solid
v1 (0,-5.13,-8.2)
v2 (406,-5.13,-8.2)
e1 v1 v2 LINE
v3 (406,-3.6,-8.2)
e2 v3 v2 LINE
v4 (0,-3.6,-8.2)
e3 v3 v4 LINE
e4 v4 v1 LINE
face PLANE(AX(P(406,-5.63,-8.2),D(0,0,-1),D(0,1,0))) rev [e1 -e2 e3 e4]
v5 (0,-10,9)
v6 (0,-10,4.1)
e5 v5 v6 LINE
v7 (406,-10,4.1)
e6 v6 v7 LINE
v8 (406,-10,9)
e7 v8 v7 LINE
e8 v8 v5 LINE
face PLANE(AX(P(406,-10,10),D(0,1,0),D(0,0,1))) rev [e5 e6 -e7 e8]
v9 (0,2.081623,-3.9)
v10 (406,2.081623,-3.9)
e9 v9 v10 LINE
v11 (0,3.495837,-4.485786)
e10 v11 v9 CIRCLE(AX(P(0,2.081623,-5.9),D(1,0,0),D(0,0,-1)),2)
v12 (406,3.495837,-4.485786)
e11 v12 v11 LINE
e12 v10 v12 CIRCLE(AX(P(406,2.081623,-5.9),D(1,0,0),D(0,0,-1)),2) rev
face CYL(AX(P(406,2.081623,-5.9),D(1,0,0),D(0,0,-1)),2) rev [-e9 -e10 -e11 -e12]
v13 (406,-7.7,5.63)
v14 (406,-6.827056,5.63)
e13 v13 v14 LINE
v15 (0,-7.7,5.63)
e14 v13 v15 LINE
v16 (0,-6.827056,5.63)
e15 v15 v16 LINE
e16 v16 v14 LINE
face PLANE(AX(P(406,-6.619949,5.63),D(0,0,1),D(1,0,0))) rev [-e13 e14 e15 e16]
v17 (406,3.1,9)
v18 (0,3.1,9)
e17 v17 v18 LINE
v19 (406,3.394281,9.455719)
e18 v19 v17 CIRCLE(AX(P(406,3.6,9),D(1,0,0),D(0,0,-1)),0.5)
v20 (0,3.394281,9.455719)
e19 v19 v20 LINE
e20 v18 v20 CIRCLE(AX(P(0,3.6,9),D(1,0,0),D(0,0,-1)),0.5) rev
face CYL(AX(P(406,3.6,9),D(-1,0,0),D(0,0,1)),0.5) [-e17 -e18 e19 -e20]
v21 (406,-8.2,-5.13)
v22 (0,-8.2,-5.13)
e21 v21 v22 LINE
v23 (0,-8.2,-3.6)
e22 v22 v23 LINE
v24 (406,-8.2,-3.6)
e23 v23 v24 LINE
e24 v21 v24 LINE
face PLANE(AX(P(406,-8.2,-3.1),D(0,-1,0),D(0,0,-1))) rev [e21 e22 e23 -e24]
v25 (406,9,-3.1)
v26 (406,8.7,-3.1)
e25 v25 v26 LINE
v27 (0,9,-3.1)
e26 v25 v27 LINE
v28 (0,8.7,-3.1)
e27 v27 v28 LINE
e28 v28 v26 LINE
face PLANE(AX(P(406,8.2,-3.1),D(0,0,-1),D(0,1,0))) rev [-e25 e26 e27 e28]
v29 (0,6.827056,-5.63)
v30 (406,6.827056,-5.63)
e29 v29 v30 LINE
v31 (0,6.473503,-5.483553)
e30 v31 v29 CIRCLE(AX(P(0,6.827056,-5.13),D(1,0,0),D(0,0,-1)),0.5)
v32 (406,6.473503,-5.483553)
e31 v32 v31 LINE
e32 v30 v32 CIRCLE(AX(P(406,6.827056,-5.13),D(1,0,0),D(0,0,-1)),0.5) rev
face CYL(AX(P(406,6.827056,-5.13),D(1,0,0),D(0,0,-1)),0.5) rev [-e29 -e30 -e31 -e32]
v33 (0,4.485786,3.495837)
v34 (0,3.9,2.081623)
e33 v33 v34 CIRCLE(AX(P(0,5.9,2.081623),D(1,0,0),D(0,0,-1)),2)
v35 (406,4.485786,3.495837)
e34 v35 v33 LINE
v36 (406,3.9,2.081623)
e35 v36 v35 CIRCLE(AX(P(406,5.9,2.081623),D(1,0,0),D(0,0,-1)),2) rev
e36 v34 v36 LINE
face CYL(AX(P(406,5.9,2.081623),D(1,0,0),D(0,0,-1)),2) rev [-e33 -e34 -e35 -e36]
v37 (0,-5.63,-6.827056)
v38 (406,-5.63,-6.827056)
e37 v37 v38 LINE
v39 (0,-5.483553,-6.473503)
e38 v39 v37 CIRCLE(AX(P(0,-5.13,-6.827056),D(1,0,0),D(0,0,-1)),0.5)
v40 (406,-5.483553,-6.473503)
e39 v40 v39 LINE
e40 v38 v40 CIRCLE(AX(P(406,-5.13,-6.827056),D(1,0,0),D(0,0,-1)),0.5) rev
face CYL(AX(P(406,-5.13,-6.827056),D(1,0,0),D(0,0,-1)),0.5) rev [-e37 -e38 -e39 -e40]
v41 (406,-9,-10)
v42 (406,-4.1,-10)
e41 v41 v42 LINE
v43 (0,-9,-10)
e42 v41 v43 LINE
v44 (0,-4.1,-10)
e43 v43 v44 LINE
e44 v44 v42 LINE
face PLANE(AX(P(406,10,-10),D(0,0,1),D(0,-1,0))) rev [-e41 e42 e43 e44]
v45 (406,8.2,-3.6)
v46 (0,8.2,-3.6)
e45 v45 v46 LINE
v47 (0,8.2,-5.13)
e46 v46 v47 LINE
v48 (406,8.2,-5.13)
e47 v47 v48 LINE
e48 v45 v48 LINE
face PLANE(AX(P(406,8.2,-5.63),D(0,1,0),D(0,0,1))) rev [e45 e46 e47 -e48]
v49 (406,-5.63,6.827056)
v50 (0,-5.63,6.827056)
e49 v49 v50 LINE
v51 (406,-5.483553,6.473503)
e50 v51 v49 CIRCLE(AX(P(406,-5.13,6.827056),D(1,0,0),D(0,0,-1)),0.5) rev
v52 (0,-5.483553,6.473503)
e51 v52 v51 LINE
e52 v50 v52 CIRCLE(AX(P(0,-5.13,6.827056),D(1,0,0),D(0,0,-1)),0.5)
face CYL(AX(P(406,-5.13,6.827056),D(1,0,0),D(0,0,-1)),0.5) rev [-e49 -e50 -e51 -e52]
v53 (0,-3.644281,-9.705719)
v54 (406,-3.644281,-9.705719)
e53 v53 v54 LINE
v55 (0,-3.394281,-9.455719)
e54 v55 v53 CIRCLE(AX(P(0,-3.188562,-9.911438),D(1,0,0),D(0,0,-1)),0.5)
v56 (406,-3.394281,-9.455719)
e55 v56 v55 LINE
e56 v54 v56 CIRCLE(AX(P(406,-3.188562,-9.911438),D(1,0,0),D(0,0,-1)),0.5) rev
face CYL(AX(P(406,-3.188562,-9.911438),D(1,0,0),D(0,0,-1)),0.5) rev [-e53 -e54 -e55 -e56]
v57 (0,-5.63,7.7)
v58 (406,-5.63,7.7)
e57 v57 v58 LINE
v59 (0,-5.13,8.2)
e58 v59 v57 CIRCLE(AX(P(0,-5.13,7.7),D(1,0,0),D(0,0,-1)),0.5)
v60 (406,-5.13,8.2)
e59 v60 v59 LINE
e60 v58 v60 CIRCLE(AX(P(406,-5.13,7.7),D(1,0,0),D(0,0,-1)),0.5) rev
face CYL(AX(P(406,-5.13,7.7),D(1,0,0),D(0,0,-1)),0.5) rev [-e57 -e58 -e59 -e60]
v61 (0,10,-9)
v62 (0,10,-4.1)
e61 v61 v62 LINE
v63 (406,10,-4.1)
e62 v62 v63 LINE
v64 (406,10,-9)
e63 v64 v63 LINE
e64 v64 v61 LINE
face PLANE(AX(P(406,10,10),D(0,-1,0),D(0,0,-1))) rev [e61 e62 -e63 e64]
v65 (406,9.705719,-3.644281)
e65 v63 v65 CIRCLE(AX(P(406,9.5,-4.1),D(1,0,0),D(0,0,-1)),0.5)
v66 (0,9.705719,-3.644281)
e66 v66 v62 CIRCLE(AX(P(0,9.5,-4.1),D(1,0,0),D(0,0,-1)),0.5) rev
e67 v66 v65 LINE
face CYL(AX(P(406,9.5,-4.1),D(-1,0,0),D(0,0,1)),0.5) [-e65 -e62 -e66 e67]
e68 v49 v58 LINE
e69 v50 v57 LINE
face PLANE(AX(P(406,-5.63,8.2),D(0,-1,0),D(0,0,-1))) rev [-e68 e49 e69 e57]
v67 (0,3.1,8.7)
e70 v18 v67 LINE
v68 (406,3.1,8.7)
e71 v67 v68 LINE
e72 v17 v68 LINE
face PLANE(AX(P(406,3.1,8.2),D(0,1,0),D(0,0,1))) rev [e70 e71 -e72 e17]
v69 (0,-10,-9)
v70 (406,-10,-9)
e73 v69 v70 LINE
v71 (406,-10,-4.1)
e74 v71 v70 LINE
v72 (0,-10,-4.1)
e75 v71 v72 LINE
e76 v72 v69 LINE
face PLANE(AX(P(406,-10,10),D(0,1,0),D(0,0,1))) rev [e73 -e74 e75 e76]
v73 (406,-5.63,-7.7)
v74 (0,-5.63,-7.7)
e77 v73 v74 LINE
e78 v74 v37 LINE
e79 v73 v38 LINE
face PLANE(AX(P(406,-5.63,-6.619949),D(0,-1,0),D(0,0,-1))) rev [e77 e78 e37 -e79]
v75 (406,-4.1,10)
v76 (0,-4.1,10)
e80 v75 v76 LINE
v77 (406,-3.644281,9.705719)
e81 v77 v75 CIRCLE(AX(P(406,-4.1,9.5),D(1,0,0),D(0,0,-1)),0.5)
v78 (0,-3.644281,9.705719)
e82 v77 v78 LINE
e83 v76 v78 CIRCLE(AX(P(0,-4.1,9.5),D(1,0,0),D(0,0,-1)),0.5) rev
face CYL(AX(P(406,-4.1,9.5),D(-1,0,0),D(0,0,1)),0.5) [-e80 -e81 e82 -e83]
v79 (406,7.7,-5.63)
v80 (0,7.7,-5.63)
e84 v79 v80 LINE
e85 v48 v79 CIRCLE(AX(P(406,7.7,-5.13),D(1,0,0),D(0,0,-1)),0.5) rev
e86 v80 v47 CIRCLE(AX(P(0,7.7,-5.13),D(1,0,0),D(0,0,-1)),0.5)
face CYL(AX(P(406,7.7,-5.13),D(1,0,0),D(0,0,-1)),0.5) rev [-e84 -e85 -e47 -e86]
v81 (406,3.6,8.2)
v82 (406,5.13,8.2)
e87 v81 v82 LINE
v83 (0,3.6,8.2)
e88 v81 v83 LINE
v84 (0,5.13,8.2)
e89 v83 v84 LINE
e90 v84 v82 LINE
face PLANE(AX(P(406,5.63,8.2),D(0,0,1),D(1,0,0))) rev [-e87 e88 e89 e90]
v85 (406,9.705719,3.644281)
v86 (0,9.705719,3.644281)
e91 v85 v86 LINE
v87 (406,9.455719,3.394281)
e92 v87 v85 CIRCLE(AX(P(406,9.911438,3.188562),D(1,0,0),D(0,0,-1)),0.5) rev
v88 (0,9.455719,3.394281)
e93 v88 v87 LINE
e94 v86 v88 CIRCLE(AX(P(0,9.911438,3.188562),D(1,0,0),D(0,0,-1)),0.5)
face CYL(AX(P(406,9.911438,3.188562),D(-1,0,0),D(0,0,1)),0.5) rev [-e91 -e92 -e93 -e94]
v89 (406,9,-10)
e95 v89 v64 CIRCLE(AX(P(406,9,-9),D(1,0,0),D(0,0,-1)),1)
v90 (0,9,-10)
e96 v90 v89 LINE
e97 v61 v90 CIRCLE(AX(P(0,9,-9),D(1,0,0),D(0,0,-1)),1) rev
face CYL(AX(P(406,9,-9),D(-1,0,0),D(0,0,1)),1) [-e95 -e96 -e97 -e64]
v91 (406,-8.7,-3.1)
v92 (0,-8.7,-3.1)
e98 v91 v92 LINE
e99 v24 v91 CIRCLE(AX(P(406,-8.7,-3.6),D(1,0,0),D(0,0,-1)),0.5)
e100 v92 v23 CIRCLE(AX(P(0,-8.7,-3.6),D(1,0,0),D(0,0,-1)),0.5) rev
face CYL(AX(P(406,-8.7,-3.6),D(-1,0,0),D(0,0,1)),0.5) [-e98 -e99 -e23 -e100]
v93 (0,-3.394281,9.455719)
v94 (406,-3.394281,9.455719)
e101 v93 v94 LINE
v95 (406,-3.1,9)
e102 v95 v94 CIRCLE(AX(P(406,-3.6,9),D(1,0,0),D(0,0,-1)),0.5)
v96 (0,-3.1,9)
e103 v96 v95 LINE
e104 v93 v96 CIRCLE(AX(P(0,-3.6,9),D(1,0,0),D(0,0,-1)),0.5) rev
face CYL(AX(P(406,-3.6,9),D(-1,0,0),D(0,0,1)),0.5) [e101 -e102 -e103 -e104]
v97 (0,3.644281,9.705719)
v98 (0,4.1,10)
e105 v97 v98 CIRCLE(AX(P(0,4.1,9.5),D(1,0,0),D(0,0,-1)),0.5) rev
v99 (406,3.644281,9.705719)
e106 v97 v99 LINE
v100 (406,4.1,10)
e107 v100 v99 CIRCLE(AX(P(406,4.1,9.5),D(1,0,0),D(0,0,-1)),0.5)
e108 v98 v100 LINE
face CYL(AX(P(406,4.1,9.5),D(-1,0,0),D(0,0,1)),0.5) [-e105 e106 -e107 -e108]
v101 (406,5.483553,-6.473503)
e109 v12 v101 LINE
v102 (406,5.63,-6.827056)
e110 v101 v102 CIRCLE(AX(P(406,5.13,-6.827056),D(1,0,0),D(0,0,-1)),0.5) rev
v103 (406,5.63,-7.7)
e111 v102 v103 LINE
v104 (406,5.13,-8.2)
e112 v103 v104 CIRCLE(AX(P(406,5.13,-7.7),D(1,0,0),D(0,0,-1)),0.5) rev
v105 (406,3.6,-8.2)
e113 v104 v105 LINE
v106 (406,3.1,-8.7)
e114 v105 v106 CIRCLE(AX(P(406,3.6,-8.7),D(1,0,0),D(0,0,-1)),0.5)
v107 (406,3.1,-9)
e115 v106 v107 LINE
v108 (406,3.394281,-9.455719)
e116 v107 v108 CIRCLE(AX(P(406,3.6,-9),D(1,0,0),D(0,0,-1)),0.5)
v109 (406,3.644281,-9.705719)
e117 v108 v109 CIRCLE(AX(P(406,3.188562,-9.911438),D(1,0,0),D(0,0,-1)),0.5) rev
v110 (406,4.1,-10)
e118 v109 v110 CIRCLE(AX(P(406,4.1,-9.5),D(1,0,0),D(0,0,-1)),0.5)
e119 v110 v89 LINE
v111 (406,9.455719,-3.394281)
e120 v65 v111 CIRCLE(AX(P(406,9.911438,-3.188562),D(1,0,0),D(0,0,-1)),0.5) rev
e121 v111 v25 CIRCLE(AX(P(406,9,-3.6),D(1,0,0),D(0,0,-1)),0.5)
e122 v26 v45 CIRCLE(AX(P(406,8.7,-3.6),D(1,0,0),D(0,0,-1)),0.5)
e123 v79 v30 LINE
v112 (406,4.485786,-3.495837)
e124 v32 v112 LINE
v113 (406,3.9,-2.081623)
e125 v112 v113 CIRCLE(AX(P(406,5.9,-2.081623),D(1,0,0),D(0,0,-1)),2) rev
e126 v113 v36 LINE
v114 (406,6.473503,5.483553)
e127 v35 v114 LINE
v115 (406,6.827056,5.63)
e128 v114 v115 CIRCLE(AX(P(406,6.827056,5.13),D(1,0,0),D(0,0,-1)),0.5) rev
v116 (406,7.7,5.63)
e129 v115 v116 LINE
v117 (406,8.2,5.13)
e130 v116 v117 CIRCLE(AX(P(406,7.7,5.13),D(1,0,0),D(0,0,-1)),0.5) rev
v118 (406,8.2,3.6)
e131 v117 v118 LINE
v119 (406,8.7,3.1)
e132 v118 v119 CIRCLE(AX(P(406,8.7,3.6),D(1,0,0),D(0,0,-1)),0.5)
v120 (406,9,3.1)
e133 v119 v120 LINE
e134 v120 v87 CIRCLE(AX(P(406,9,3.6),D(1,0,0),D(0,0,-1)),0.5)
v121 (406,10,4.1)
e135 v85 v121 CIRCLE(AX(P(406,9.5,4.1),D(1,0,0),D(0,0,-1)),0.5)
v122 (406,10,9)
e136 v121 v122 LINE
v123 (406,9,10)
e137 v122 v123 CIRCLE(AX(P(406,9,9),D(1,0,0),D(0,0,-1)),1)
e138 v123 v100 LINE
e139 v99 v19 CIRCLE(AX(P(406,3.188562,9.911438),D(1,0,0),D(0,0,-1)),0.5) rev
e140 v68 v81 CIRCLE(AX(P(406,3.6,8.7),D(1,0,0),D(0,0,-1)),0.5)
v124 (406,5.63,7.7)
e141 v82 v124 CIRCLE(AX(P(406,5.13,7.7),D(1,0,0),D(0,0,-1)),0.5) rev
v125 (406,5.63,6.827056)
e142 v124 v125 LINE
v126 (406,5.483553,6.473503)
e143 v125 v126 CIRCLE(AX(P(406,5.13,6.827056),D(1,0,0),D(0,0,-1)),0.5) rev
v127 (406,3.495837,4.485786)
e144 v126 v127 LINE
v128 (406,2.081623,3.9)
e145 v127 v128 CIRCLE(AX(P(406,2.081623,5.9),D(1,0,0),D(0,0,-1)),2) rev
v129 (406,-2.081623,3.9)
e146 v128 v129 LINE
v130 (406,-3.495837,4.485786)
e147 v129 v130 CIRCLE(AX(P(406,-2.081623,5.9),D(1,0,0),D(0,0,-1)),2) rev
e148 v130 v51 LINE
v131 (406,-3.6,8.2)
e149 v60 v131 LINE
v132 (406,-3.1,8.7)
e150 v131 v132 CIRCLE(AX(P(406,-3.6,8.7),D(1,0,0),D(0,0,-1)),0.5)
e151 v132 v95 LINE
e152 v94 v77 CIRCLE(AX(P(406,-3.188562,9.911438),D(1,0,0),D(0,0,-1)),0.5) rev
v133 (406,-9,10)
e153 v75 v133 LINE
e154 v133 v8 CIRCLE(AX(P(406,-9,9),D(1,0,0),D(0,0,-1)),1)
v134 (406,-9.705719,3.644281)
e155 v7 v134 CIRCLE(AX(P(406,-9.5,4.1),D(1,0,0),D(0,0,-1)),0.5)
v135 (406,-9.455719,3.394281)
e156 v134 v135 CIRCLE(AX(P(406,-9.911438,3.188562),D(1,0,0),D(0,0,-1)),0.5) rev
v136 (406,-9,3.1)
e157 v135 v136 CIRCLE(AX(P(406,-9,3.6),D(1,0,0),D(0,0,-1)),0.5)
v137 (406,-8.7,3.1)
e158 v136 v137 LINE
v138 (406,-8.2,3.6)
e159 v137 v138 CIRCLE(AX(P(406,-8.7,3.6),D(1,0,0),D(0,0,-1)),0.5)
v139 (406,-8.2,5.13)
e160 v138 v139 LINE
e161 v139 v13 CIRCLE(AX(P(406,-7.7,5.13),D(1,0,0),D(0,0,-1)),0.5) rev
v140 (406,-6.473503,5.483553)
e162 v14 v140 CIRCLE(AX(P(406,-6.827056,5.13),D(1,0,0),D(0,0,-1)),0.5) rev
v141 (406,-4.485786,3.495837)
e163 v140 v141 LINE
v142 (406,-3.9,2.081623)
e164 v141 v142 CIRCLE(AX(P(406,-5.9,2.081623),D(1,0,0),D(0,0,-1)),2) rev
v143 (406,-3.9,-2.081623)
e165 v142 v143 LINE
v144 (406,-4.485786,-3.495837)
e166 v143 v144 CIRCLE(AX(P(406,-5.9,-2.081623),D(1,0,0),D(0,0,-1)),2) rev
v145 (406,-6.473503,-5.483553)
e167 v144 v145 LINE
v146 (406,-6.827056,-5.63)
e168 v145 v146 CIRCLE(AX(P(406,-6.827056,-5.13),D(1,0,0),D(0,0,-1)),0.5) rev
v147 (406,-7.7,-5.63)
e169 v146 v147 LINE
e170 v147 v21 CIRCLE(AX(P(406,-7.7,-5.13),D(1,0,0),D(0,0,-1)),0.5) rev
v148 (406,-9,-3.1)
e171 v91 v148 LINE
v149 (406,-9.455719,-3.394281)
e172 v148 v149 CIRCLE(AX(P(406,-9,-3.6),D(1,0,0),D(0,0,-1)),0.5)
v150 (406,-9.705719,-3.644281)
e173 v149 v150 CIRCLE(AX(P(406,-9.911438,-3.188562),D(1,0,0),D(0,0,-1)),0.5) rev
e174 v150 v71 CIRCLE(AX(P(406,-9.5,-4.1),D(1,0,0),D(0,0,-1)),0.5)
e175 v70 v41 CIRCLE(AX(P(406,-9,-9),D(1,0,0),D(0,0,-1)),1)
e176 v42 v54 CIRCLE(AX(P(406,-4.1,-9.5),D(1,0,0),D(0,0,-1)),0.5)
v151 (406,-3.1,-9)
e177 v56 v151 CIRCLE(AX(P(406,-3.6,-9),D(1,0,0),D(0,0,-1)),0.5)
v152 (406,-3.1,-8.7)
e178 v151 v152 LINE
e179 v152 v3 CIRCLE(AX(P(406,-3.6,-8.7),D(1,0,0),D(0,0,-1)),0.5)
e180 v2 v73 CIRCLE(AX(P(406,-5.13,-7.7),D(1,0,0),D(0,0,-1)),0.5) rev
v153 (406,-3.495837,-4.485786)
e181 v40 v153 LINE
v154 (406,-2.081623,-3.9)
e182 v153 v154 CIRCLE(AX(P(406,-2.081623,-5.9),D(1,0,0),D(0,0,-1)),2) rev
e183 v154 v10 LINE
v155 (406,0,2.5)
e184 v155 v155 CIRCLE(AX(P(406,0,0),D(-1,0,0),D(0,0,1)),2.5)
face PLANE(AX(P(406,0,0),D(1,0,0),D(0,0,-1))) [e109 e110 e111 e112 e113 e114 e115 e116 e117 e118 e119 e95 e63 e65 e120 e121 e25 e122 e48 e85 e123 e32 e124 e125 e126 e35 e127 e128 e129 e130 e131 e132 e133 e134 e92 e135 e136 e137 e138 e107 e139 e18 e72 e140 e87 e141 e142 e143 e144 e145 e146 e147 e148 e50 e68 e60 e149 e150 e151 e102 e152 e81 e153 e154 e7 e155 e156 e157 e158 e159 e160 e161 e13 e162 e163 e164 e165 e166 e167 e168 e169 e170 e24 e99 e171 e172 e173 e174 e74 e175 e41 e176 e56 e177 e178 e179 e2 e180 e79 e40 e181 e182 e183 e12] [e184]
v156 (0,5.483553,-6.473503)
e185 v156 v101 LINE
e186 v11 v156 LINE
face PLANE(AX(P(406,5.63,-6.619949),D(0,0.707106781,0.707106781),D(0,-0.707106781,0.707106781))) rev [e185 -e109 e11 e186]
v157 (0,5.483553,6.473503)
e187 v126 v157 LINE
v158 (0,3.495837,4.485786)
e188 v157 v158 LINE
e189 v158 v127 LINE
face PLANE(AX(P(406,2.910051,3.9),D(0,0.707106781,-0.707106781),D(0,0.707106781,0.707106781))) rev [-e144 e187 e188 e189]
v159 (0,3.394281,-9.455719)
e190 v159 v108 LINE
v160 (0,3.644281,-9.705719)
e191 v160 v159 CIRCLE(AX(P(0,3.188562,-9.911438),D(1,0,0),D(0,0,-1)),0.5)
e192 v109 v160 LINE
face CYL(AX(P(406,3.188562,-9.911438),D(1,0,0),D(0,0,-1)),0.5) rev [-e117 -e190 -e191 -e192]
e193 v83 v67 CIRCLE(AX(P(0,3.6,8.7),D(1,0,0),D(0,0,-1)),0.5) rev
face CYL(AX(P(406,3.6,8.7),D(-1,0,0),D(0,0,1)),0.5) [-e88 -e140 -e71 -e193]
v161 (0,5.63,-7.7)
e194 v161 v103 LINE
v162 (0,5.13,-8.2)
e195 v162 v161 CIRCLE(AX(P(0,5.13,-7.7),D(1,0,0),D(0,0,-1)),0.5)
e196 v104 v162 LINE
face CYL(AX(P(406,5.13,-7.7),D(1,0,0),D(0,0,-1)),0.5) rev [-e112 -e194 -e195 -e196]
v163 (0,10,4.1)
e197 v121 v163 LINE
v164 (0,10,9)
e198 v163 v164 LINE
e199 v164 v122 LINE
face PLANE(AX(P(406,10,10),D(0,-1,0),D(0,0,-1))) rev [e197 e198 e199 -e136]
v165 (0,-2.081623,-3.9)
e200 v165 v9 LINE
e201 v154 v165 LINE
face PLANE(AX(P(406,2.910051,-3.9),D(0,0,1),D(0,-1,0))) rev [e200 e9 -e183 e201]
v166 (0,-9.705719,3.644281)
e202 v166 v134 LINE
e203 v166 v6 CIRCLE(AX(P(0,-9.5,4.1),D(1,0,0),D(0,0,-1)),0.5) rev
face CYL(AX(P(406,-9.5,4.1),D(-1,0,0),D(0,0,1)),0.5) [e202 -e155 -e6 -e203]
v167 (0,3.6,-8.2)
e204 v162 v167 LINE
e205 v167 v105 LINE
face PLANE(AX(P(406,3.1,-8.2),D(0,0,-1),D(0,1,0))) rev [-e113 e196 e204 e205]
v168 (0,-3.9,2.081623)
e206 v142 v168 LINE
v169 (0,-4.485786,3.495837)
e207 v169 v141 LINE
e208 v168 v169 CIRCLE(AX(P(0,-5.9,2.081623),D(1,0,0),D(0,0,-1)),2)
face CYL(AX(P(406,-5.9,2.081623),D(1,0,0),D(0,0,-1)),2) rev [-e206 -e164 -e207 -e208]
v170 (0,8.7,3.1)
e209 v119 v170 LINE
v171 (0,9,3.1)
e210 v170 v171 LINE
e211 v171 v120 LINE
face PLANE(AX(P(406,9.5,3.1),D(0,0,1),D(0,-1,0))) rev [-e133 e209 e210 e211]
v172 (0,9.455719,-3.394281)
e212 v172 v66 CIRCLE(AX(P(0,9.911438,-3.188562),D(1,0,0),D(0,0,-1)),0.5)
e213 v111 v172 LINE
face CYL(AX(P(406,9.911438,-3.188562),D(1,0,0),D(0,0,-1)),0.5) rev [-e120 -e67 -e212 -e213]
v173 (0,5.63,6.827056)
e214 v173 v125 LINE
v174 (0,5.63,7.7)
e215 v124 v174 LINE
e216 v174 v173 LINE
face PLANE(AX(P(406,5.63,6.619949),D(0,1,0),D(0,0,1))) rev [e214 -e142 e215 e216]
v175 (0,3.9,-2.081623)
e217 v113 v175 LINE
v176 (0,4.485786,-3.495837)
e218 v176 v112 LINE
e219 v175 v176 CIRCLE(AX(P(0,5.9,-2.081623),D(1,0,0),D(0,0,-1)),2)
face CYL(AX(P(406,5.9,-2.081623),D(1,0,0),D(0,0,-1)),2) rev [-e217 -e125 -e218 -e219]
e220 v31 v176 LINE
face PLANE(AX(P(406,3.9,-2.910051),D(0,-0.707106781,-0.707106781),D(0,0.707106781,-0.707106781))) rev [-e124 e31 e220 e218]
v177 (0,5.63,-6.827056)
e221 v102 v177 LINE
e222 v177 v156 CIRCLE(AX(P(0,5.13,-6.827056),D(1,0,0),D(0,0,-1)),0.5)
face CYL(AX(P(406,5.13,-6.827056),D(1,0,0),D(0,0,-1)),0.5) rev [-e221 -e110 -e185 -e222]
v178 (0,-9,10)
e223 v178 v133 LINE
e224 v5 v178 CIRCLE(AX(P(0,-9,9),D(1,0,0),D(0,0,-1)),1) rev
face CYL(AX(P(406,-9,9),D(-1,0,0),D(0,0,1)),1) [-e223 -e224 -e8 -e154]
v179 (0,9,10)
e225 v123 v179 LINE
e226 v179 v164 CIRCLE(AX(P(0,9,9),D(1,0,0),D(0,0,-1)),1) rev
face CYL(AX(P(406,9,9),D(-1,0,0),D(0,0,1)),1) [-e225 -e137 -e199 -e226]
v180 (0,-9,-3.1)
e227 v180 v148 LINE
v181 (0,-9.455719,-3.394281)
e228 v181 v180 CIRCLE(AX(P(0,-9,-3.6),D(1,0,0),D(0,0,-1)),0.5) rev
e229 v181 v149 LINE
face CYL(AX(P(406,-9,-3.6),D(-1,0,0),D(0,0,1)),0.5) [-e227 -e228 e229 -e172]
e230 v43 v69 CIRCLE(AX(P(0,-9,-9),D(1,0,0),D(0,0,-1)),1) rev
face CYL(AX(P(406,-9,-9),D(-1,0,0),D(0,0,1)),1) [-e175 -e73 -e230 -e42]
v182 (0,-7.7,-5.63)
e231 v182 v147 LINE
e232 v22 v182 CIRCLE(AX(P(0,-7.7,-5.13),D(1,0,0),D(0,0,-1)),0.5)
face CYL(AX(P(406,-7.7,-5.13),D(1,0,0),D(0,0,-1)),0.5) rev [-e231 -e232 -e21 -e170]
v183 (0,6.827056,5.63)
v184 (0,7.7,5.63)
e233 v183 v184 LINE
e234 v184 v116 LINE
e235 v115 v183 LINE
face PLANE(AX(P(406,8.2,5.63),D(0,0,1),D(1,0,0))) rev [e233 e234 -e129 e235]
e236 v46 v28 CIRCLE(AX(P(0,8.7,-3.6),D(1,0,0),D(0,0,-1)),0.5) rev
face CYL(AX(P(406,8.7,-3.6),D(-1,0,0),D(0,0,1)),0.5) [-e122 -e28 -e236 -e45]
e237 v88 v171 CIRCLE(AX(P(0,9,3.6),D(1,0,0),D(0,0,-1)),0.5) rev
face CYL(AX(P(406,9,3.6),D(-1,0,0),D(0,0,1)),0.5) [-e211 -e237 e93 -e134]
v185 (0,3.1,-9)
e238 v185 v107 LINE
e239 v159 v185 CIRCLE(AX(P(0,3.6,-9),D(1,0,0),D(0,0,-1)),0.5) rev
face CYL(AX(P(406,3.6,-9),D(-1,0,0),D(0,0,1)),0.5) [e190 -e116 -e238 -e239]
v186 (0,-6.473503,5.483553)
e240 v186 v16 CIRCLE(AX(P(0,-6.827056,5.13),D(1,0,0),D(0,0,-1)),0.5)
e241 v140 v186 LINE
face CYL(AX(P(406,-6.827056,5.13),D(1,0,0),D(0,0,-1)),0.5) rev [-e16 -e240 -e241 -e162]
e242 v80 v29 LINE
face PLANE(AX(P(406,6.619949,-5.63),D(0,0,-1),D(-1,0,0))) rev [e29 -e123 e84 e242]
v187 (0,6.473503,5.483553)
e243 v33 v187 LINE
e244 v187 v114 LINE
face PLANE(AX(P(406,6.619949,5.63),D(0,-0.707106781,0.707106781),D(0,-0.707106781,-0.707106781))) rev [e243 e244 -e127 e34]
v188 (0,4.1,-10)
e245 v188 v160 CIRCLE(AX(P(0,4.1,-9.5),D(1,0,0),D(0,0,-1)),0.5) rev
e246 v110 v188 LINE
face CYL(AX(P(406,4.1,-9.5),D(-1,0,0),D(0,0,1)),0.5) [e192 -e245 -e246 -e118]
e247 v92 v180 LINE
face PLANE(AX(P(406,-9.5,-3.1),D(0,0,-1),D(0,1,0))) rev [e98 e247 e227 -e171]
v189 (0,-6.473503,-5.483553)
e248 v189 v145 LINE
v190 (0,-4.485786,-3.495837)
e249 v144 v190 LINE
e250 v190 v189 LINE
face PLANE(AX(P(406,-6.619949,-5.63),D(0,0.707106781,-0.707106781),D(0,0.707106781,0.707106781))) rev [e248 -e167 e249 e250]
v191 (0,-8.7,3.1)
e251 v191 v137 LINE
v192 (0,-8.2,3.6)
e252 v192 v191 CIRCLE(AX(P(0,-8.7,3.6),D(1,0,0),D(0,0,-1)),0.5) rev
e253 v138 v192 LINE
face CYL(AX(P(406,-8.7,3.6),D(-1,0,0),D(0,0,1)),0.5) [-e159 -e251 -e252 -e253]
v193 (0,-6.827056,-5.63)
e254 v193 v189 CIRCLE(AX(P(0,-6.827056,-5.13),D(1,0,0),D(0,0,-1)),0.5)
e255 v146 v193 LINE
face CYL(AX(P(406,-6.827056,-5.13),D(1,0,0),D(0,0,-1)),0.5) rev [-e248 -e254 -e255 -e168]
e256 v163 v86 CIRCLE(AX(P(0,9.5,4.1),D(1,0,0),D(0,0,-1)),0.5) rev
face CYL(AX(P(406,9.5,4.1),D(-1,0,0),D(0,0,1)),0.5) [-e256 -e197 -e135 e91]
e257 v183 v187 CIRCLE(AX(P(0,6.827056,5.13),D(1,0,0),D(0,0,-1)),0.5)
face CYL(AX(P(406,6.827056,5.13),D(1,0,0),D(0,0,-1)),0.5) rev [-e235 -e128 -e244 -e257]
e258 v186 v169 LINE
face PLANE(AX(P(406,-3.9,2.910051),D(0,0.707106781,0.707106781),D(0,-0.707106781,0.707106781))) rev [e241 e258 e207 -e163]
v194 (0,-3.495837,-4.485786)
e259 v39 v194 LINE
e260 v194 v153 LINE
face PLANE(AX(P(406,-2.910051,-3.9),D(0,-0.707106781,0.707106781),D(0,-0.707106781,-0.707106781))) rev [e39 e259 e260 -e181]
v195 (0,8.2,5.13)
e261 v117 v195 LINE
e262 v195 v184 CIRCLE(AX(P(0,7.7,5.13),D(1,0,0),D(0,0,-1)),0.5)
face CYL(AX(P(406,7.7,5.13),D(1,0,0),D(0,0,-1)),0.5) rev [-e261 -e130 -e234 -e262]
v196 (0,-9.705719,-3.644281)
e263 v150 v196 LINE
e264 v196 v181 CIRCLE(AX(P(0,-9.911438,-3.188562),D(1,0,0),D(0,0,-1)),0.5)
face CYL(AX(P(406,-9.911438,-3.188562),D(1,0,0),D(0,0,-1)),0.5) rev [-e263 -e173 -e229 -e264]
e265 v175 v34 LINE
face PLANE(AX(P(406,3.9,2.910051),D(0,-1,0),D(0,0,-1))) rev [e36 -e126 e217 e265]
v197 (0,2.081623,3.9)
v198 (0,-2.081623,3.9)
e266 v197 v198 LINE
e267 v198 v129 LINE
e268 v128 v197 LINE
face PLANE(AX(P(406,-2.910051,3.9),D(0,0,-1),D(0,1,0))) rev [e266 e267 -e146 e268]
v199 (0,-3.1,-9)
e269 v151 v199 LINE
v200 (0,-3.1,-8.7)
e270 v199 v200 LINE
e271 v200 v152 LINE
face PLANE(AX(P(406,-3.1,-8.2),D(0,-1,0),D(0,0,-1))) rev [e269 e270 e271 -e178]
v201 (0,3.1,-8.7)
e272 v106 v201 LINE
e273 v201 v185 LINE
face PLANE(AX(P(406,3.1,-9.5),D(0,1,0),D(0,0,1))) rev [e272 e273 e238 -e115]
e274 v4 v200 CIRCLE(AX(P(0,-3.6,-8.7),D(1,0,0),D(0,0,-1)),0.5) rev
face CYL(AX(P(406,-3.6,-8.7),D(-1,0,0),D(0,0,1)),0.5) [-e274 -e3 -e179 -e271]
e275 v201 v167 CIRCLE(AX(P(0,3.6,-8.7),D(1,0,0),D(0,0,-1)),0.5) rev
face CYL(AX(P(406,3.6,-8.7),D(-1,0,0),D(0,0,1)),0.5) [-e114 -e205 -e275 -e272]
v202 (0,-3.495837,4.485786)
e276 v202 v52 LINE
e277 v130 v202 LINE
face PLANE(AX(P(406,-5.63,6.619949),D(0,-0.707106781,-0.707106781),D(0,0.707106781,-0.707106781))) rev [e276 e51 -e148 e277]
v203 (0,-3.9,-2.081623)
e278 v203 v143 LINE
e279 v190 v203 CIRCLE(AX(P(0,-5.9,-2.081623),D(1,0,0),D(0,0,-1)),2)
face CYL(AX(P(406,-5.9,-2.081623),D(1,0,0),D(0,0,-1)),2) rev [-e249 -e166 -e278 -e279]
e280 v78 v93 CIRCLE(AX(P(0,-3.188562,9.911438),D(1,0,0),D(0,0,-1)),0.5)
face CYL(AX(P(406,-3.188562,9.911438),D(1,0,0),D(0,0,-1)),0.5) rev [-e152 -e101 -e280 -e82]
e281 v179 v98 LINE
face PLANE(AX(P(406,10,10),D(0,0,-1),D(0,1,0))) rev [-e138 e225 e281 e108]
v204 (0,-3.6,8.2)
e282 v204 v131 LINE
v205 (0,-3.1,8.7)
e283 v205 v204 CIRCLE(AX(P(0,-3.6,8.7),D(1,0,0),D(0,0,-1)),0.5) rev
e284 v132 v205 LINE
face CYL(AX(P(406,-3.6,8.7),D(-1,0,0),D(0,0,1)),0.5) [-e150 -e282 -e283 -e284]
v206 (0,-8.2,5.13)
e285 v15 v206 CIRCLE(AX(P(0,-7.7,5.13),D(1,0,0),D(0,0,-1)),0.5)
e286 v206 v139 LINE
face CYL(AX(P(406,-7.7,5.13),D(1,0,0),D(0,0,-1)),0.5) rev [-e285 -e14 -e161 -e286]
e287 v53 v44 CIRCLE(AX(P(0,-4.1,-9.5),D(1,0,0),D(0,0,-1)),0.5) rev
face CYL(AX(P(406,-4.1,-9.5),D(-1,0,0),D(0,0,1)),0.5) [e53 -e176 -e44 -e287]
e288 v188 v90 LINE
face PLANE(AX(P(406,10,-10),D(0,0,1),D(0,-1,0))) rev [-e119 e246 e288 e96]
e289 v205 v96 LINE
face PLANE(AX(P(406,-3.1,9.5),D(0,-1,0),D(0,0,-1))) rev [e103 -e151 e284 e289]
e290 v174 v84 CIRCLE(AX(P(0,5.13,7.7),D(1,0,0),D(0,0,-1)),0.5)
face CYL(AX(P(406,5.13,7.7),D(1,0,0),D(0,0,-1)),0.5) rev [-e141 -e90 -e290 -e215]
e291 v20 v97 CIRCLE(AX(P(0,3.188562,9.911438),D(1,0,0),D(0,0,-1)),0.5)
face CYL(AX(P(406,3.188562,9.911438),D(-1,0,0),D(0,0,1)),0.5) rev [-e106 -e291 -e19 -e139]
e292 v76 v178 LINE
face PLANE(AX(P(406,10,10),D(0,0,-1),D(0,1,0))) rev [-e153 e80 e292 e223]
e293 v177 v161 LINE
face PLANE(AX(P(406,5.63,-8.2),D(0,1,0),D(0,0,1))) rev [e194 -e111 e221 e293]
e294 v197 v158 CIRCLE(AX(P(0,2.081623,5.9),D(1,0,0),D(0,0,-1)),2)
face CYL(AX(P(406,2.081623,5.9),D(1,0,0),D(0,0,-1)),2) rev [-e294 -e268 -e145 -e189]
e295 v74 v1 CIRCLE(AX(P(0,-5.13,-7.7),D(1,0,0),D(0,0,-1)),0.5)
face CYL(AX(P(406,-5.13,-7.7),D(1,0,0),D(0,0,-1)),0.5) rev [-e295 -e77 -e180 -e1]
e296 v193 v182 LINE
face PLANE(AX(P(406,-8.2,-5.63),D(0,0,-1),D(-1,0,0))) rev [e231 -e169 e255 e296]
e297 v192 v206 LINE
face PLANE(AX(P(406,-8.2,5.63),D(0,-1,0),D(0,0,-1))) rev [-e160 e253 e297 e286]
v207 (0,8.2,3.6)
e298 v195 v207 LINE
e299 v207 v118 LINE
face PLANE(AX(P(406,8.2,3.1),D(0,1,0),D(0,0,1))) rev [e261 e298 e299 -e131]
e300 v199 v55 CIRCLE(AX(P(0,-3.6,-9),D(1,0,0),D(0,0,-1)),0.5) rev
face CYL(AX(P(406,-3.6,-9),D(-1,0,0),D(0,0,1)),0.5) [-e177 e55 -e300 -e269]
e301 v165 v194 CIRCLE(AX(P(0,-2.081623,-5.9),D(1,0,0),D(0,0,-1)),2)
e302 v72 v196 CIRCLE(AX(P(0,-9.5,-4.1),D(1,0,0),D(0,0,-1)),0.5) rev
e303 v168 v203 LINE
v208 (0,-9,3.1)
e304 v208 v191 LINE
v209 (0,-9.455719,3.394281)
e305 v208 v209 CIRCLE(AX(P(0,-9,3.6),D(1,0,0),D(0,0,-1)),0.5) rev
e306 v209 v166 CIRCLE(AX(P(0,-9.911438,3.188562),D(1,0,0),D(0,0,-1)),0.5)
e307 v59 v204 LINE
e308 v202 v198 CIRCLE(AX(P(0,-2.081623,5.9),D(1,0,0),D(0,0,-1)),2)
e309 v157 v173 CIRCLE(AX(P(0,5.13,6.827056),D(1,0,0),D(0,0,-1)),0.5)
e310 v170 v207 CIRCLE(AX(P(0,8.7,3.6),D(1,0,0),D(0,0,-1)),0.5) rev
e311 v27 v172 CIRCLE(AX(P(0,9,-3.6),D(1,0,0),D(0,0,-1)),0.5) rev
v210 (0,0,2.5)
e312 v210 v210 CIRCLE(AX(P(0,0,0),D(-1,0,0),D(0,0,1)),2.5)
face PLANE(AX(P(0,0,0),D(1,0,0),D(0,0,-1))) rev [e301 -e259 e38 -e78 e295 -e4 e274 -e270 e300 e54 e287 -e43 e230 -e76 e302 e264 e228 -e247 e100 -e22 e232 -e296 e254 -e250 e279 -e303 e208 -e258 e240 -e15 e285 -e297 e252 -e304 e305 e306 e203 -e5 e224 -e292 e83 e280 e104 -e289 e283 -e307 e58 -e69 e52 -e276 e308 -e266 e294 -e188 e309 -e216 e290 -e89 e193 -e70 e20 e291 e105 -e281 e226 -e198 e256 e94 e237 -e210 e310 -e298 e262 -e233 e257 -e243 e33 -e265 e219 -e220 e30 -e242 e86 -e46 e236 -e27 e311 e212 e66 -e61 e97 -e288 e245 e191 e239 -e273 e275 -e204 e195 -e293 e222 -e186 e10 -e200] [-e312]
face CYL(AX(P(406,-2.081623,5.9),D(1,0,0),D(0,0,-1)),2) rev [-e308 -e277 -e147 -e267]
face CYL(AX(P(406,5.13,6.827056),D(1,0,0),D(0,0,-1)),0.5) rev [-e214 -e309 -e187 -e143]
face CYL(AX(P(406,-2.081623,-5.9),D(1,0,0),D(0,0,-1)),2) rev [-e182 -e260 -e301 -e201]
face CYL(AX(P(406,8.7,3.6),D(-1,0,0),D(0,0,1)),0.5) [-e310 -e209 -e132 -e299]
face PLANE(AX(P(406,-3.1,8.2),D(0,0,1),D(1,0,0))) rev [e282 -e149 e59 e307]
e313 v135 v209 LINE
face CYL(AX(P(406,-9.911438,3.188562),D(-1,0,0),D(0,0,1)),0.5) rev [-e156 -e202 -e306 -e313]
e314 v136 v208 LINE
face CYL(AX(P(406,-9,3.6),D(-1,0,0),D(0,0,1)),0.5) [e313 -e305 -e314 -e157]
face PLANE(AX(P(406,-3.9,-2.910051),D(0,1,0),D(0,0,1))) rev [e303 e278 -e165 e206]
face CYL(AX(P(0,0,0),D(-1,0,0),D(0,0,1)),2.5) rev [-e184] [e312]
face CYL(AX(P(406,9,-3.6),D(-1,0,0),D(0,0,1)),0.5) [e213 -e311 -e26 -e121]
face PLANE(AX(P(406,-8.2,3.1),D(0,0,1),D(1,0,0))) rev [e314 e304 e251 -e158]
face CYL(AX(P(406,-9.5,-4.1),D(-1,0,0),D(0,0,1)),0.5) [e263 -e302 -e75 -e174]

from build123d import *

# Parameters (mm, degrees)
SKETCH1_W                = 20
SKETCH1_H                = 20
BOSS_EXTRUDE1_DEPTH      = 406
FILLET1_R                = 1
CUT_EXTRUDE1_DEPTH       = 407.246230752
F_5_0_5_DIAMETER_HOLE1_D = 5
FILLET2_R                = 2
FILLET3_R                = 0.5
FILLET4_R                = 0.5
FILLET5_R                = 0.5


with BuildPart() as part:
    # Sketch1 → Boss-Extrude1 (new body)
    with BuildSketch(Plane(origin=(0, 0, 0), x_dir=(0, 0, -1), z_dir=(1, 0, 0))):
        Rectangle(SKETCH1_W, SKETCH1_H)
    extrude(amount=BOSS_EXTRUDE1_DEPTH)

    # Fillet1
    fillet1_edges = [part.edges().sort_by_distance(p)[0] for p in [
        (203, 10, 10),
        (203, 10, -10),
        (203, -10, -10),
        (203, -10, 10),
    ]]
    fillet(fillet1_edges, radius=FILLET1_R)

    # Sketch3 → Cut-Extrude1 (cut, through all)
    with BuildSketch(Plane.ZY):
        Polygon((-3.6, 10), (3.6, 10), (3.6, 9.5), (3.1, 9.5), (3.1, 8.2), (5.63, 8.2), (5.63, 6.619949494), (2.910050506, 3.9), (-2.910050506, 3.9), (-5.63, 6.619949494), (-5.63, 8.2), (-3.1, 8.2), (-3.1, 9.5), (-3.6, 9.5), align=None)
        Polygon((10, 3.6), (10, -3.6), (9.5, -3.6), (9.5, -3.1), (8.2, -3.1), (8.2, -5.63), (6.619949494, -5.63), (3.9, -2.910050506), (3.9, 2.910050506), (6.619949494, 5.63), (8.2, 5.63), (8.2, 3.1), (9.5, 3.1), (9.5, 3.6), align=None)
        Polygon((3.6, -10), (-3.6, -10), (-3.6, -9.5), (-3.1, -9.5), (-3.1, -8.2), (-5.63, -8.2), (-5.63, -6.619949494), (-2.910050506, -3.9), (2.910050506, -3.9), (5.63, -6.619949494), (5.63, -8.2), (3.1, -8.2), (3.1, -9.5), (3.6, -9.5), align=None)
        Polygon((-10, -3.6), (-10, 3.6), (-9.5, 3.6), (-9.5, 3.1), (-8.2, 3.1), (-8.2, 5.63), (-6.619949494, 5.63), (-3.9, 2.910050506), (-3.9, -2.910050506), (-6.619949494, -5.63), (-8.2, -5.63), (-8.2, -3.1), (-9.5, -3.1), (-9.5, -3.6), align=None)
    extrude(amount=-CUT_EXTRUDE1_DEPTH, mode=Mode.SUBTRACT)

    # Ø5.0 (5) Diameter Hole1 (through all)
    with Locations(Plane.ZY):
        with Locations((0, 0)):
            Hole(F_5_0_5_DIAMETER_HOLE1_D / 2)

    # Fillet2
    fillet2_edges = [part.edges().sort_by_distance(p)[0] for p in [
        (203, -3.9, -2.910050506),
        (203, -3.9, 2.910050506),
        (203, 2.910050506, -3.9),
        (203, -2.910050506, -3.9),
        (203, -2.910050506, 3.9),
        (203, 2.910050506, 3.9),
        (203, 3.9, 2.910050506),
        (203, 3.9, -2.910050506),
    ]]
    fillet(fillet2_edges, radius=FILLET2_R)

    # Fillet3
    fillet3_edges = [part.edges().sort_by_distance(p)[0] for p in [
        (203, 3.6, -10),
        (203, 3.1, -9.5),
        (203, 3.1, -8.2),
        (203, 5.63, -8.2),
        (203, 5.63, -6.619949494),
        (203, 3.6, 10),
        (203, 3.1, 9.5),
        (203, 3.1, 8.2),
        (203, 5.63, 8.2),
        (203, 5.63, 6.619949494),
        (203, 6.619949494, 5.63),
        (203, 8.2, 5.63),
        (203, 8.2, 3.1),
        (203, 9.5, 3.1),
        (203, 10, 3.6),
        (203, 9.5, -3.1),
        (203, 10, -3.6),
        (203, 8.2, -3.1),
        (203, 8.2, -5.63),
        (203, 6.619949494, -5.63),
    ]]
    fillet(fillet3_edges, radius=FILLET3_R - 0.0001)  # a hair under: the kernel refuses the full size

    # Fillet4
    fillet4_edges = [part.edges().sort_by_distance(p)[0] for p in [
        (203, -3.6, 10),
        (203, -3.1, 9.5),
        (203, -3.1, 8.2),
        (203, -5.63, 8.2),
        (203, -5.63, 6.619949494),
        (203, -6.619949494, 5.63),
        (203, -8.2, 5.63),
        (203, -8.2, 3.1),
        (203, -10, 3.6),
        (203, -9.5, 3.1),
        (203, -10, -3.6),
        (203, -9.5, -3.1),
        (203, -8.2, -3.1),
        (203, -8.2, -5.63),
        (203, -6.619949494, -5.63),
        (203, -5.63, -6.619949494),
        (203, -5.63, -8.2),
        (203, -3.1, -8.2),
        (203, -3.1, -9.5),
        (203, -3.6, -10),
    ]]
    fillet(fillet4_edges, radius=FILLET4_R - 0.0001)  # a hair under: the kernel refuses the full size

    # Fillet5
    fillet5_edges = [part.edges().sort_by_distance(p)[0] for p in [
        (203, 3.6, 9.5),
        (203, 9.5, 3.6),
        (203, 9.5, -3.6),
        (203, 3.6, -9.5),
        (203, -3.6, 9.5),
        (203, -9.5, 3.6),
        (203, -9.5, -3.6),
        (203, -3.6, -9.5),
    ]]
    fillet(fillet5_edges, radius=FILLET5_R)


solid = part.part
